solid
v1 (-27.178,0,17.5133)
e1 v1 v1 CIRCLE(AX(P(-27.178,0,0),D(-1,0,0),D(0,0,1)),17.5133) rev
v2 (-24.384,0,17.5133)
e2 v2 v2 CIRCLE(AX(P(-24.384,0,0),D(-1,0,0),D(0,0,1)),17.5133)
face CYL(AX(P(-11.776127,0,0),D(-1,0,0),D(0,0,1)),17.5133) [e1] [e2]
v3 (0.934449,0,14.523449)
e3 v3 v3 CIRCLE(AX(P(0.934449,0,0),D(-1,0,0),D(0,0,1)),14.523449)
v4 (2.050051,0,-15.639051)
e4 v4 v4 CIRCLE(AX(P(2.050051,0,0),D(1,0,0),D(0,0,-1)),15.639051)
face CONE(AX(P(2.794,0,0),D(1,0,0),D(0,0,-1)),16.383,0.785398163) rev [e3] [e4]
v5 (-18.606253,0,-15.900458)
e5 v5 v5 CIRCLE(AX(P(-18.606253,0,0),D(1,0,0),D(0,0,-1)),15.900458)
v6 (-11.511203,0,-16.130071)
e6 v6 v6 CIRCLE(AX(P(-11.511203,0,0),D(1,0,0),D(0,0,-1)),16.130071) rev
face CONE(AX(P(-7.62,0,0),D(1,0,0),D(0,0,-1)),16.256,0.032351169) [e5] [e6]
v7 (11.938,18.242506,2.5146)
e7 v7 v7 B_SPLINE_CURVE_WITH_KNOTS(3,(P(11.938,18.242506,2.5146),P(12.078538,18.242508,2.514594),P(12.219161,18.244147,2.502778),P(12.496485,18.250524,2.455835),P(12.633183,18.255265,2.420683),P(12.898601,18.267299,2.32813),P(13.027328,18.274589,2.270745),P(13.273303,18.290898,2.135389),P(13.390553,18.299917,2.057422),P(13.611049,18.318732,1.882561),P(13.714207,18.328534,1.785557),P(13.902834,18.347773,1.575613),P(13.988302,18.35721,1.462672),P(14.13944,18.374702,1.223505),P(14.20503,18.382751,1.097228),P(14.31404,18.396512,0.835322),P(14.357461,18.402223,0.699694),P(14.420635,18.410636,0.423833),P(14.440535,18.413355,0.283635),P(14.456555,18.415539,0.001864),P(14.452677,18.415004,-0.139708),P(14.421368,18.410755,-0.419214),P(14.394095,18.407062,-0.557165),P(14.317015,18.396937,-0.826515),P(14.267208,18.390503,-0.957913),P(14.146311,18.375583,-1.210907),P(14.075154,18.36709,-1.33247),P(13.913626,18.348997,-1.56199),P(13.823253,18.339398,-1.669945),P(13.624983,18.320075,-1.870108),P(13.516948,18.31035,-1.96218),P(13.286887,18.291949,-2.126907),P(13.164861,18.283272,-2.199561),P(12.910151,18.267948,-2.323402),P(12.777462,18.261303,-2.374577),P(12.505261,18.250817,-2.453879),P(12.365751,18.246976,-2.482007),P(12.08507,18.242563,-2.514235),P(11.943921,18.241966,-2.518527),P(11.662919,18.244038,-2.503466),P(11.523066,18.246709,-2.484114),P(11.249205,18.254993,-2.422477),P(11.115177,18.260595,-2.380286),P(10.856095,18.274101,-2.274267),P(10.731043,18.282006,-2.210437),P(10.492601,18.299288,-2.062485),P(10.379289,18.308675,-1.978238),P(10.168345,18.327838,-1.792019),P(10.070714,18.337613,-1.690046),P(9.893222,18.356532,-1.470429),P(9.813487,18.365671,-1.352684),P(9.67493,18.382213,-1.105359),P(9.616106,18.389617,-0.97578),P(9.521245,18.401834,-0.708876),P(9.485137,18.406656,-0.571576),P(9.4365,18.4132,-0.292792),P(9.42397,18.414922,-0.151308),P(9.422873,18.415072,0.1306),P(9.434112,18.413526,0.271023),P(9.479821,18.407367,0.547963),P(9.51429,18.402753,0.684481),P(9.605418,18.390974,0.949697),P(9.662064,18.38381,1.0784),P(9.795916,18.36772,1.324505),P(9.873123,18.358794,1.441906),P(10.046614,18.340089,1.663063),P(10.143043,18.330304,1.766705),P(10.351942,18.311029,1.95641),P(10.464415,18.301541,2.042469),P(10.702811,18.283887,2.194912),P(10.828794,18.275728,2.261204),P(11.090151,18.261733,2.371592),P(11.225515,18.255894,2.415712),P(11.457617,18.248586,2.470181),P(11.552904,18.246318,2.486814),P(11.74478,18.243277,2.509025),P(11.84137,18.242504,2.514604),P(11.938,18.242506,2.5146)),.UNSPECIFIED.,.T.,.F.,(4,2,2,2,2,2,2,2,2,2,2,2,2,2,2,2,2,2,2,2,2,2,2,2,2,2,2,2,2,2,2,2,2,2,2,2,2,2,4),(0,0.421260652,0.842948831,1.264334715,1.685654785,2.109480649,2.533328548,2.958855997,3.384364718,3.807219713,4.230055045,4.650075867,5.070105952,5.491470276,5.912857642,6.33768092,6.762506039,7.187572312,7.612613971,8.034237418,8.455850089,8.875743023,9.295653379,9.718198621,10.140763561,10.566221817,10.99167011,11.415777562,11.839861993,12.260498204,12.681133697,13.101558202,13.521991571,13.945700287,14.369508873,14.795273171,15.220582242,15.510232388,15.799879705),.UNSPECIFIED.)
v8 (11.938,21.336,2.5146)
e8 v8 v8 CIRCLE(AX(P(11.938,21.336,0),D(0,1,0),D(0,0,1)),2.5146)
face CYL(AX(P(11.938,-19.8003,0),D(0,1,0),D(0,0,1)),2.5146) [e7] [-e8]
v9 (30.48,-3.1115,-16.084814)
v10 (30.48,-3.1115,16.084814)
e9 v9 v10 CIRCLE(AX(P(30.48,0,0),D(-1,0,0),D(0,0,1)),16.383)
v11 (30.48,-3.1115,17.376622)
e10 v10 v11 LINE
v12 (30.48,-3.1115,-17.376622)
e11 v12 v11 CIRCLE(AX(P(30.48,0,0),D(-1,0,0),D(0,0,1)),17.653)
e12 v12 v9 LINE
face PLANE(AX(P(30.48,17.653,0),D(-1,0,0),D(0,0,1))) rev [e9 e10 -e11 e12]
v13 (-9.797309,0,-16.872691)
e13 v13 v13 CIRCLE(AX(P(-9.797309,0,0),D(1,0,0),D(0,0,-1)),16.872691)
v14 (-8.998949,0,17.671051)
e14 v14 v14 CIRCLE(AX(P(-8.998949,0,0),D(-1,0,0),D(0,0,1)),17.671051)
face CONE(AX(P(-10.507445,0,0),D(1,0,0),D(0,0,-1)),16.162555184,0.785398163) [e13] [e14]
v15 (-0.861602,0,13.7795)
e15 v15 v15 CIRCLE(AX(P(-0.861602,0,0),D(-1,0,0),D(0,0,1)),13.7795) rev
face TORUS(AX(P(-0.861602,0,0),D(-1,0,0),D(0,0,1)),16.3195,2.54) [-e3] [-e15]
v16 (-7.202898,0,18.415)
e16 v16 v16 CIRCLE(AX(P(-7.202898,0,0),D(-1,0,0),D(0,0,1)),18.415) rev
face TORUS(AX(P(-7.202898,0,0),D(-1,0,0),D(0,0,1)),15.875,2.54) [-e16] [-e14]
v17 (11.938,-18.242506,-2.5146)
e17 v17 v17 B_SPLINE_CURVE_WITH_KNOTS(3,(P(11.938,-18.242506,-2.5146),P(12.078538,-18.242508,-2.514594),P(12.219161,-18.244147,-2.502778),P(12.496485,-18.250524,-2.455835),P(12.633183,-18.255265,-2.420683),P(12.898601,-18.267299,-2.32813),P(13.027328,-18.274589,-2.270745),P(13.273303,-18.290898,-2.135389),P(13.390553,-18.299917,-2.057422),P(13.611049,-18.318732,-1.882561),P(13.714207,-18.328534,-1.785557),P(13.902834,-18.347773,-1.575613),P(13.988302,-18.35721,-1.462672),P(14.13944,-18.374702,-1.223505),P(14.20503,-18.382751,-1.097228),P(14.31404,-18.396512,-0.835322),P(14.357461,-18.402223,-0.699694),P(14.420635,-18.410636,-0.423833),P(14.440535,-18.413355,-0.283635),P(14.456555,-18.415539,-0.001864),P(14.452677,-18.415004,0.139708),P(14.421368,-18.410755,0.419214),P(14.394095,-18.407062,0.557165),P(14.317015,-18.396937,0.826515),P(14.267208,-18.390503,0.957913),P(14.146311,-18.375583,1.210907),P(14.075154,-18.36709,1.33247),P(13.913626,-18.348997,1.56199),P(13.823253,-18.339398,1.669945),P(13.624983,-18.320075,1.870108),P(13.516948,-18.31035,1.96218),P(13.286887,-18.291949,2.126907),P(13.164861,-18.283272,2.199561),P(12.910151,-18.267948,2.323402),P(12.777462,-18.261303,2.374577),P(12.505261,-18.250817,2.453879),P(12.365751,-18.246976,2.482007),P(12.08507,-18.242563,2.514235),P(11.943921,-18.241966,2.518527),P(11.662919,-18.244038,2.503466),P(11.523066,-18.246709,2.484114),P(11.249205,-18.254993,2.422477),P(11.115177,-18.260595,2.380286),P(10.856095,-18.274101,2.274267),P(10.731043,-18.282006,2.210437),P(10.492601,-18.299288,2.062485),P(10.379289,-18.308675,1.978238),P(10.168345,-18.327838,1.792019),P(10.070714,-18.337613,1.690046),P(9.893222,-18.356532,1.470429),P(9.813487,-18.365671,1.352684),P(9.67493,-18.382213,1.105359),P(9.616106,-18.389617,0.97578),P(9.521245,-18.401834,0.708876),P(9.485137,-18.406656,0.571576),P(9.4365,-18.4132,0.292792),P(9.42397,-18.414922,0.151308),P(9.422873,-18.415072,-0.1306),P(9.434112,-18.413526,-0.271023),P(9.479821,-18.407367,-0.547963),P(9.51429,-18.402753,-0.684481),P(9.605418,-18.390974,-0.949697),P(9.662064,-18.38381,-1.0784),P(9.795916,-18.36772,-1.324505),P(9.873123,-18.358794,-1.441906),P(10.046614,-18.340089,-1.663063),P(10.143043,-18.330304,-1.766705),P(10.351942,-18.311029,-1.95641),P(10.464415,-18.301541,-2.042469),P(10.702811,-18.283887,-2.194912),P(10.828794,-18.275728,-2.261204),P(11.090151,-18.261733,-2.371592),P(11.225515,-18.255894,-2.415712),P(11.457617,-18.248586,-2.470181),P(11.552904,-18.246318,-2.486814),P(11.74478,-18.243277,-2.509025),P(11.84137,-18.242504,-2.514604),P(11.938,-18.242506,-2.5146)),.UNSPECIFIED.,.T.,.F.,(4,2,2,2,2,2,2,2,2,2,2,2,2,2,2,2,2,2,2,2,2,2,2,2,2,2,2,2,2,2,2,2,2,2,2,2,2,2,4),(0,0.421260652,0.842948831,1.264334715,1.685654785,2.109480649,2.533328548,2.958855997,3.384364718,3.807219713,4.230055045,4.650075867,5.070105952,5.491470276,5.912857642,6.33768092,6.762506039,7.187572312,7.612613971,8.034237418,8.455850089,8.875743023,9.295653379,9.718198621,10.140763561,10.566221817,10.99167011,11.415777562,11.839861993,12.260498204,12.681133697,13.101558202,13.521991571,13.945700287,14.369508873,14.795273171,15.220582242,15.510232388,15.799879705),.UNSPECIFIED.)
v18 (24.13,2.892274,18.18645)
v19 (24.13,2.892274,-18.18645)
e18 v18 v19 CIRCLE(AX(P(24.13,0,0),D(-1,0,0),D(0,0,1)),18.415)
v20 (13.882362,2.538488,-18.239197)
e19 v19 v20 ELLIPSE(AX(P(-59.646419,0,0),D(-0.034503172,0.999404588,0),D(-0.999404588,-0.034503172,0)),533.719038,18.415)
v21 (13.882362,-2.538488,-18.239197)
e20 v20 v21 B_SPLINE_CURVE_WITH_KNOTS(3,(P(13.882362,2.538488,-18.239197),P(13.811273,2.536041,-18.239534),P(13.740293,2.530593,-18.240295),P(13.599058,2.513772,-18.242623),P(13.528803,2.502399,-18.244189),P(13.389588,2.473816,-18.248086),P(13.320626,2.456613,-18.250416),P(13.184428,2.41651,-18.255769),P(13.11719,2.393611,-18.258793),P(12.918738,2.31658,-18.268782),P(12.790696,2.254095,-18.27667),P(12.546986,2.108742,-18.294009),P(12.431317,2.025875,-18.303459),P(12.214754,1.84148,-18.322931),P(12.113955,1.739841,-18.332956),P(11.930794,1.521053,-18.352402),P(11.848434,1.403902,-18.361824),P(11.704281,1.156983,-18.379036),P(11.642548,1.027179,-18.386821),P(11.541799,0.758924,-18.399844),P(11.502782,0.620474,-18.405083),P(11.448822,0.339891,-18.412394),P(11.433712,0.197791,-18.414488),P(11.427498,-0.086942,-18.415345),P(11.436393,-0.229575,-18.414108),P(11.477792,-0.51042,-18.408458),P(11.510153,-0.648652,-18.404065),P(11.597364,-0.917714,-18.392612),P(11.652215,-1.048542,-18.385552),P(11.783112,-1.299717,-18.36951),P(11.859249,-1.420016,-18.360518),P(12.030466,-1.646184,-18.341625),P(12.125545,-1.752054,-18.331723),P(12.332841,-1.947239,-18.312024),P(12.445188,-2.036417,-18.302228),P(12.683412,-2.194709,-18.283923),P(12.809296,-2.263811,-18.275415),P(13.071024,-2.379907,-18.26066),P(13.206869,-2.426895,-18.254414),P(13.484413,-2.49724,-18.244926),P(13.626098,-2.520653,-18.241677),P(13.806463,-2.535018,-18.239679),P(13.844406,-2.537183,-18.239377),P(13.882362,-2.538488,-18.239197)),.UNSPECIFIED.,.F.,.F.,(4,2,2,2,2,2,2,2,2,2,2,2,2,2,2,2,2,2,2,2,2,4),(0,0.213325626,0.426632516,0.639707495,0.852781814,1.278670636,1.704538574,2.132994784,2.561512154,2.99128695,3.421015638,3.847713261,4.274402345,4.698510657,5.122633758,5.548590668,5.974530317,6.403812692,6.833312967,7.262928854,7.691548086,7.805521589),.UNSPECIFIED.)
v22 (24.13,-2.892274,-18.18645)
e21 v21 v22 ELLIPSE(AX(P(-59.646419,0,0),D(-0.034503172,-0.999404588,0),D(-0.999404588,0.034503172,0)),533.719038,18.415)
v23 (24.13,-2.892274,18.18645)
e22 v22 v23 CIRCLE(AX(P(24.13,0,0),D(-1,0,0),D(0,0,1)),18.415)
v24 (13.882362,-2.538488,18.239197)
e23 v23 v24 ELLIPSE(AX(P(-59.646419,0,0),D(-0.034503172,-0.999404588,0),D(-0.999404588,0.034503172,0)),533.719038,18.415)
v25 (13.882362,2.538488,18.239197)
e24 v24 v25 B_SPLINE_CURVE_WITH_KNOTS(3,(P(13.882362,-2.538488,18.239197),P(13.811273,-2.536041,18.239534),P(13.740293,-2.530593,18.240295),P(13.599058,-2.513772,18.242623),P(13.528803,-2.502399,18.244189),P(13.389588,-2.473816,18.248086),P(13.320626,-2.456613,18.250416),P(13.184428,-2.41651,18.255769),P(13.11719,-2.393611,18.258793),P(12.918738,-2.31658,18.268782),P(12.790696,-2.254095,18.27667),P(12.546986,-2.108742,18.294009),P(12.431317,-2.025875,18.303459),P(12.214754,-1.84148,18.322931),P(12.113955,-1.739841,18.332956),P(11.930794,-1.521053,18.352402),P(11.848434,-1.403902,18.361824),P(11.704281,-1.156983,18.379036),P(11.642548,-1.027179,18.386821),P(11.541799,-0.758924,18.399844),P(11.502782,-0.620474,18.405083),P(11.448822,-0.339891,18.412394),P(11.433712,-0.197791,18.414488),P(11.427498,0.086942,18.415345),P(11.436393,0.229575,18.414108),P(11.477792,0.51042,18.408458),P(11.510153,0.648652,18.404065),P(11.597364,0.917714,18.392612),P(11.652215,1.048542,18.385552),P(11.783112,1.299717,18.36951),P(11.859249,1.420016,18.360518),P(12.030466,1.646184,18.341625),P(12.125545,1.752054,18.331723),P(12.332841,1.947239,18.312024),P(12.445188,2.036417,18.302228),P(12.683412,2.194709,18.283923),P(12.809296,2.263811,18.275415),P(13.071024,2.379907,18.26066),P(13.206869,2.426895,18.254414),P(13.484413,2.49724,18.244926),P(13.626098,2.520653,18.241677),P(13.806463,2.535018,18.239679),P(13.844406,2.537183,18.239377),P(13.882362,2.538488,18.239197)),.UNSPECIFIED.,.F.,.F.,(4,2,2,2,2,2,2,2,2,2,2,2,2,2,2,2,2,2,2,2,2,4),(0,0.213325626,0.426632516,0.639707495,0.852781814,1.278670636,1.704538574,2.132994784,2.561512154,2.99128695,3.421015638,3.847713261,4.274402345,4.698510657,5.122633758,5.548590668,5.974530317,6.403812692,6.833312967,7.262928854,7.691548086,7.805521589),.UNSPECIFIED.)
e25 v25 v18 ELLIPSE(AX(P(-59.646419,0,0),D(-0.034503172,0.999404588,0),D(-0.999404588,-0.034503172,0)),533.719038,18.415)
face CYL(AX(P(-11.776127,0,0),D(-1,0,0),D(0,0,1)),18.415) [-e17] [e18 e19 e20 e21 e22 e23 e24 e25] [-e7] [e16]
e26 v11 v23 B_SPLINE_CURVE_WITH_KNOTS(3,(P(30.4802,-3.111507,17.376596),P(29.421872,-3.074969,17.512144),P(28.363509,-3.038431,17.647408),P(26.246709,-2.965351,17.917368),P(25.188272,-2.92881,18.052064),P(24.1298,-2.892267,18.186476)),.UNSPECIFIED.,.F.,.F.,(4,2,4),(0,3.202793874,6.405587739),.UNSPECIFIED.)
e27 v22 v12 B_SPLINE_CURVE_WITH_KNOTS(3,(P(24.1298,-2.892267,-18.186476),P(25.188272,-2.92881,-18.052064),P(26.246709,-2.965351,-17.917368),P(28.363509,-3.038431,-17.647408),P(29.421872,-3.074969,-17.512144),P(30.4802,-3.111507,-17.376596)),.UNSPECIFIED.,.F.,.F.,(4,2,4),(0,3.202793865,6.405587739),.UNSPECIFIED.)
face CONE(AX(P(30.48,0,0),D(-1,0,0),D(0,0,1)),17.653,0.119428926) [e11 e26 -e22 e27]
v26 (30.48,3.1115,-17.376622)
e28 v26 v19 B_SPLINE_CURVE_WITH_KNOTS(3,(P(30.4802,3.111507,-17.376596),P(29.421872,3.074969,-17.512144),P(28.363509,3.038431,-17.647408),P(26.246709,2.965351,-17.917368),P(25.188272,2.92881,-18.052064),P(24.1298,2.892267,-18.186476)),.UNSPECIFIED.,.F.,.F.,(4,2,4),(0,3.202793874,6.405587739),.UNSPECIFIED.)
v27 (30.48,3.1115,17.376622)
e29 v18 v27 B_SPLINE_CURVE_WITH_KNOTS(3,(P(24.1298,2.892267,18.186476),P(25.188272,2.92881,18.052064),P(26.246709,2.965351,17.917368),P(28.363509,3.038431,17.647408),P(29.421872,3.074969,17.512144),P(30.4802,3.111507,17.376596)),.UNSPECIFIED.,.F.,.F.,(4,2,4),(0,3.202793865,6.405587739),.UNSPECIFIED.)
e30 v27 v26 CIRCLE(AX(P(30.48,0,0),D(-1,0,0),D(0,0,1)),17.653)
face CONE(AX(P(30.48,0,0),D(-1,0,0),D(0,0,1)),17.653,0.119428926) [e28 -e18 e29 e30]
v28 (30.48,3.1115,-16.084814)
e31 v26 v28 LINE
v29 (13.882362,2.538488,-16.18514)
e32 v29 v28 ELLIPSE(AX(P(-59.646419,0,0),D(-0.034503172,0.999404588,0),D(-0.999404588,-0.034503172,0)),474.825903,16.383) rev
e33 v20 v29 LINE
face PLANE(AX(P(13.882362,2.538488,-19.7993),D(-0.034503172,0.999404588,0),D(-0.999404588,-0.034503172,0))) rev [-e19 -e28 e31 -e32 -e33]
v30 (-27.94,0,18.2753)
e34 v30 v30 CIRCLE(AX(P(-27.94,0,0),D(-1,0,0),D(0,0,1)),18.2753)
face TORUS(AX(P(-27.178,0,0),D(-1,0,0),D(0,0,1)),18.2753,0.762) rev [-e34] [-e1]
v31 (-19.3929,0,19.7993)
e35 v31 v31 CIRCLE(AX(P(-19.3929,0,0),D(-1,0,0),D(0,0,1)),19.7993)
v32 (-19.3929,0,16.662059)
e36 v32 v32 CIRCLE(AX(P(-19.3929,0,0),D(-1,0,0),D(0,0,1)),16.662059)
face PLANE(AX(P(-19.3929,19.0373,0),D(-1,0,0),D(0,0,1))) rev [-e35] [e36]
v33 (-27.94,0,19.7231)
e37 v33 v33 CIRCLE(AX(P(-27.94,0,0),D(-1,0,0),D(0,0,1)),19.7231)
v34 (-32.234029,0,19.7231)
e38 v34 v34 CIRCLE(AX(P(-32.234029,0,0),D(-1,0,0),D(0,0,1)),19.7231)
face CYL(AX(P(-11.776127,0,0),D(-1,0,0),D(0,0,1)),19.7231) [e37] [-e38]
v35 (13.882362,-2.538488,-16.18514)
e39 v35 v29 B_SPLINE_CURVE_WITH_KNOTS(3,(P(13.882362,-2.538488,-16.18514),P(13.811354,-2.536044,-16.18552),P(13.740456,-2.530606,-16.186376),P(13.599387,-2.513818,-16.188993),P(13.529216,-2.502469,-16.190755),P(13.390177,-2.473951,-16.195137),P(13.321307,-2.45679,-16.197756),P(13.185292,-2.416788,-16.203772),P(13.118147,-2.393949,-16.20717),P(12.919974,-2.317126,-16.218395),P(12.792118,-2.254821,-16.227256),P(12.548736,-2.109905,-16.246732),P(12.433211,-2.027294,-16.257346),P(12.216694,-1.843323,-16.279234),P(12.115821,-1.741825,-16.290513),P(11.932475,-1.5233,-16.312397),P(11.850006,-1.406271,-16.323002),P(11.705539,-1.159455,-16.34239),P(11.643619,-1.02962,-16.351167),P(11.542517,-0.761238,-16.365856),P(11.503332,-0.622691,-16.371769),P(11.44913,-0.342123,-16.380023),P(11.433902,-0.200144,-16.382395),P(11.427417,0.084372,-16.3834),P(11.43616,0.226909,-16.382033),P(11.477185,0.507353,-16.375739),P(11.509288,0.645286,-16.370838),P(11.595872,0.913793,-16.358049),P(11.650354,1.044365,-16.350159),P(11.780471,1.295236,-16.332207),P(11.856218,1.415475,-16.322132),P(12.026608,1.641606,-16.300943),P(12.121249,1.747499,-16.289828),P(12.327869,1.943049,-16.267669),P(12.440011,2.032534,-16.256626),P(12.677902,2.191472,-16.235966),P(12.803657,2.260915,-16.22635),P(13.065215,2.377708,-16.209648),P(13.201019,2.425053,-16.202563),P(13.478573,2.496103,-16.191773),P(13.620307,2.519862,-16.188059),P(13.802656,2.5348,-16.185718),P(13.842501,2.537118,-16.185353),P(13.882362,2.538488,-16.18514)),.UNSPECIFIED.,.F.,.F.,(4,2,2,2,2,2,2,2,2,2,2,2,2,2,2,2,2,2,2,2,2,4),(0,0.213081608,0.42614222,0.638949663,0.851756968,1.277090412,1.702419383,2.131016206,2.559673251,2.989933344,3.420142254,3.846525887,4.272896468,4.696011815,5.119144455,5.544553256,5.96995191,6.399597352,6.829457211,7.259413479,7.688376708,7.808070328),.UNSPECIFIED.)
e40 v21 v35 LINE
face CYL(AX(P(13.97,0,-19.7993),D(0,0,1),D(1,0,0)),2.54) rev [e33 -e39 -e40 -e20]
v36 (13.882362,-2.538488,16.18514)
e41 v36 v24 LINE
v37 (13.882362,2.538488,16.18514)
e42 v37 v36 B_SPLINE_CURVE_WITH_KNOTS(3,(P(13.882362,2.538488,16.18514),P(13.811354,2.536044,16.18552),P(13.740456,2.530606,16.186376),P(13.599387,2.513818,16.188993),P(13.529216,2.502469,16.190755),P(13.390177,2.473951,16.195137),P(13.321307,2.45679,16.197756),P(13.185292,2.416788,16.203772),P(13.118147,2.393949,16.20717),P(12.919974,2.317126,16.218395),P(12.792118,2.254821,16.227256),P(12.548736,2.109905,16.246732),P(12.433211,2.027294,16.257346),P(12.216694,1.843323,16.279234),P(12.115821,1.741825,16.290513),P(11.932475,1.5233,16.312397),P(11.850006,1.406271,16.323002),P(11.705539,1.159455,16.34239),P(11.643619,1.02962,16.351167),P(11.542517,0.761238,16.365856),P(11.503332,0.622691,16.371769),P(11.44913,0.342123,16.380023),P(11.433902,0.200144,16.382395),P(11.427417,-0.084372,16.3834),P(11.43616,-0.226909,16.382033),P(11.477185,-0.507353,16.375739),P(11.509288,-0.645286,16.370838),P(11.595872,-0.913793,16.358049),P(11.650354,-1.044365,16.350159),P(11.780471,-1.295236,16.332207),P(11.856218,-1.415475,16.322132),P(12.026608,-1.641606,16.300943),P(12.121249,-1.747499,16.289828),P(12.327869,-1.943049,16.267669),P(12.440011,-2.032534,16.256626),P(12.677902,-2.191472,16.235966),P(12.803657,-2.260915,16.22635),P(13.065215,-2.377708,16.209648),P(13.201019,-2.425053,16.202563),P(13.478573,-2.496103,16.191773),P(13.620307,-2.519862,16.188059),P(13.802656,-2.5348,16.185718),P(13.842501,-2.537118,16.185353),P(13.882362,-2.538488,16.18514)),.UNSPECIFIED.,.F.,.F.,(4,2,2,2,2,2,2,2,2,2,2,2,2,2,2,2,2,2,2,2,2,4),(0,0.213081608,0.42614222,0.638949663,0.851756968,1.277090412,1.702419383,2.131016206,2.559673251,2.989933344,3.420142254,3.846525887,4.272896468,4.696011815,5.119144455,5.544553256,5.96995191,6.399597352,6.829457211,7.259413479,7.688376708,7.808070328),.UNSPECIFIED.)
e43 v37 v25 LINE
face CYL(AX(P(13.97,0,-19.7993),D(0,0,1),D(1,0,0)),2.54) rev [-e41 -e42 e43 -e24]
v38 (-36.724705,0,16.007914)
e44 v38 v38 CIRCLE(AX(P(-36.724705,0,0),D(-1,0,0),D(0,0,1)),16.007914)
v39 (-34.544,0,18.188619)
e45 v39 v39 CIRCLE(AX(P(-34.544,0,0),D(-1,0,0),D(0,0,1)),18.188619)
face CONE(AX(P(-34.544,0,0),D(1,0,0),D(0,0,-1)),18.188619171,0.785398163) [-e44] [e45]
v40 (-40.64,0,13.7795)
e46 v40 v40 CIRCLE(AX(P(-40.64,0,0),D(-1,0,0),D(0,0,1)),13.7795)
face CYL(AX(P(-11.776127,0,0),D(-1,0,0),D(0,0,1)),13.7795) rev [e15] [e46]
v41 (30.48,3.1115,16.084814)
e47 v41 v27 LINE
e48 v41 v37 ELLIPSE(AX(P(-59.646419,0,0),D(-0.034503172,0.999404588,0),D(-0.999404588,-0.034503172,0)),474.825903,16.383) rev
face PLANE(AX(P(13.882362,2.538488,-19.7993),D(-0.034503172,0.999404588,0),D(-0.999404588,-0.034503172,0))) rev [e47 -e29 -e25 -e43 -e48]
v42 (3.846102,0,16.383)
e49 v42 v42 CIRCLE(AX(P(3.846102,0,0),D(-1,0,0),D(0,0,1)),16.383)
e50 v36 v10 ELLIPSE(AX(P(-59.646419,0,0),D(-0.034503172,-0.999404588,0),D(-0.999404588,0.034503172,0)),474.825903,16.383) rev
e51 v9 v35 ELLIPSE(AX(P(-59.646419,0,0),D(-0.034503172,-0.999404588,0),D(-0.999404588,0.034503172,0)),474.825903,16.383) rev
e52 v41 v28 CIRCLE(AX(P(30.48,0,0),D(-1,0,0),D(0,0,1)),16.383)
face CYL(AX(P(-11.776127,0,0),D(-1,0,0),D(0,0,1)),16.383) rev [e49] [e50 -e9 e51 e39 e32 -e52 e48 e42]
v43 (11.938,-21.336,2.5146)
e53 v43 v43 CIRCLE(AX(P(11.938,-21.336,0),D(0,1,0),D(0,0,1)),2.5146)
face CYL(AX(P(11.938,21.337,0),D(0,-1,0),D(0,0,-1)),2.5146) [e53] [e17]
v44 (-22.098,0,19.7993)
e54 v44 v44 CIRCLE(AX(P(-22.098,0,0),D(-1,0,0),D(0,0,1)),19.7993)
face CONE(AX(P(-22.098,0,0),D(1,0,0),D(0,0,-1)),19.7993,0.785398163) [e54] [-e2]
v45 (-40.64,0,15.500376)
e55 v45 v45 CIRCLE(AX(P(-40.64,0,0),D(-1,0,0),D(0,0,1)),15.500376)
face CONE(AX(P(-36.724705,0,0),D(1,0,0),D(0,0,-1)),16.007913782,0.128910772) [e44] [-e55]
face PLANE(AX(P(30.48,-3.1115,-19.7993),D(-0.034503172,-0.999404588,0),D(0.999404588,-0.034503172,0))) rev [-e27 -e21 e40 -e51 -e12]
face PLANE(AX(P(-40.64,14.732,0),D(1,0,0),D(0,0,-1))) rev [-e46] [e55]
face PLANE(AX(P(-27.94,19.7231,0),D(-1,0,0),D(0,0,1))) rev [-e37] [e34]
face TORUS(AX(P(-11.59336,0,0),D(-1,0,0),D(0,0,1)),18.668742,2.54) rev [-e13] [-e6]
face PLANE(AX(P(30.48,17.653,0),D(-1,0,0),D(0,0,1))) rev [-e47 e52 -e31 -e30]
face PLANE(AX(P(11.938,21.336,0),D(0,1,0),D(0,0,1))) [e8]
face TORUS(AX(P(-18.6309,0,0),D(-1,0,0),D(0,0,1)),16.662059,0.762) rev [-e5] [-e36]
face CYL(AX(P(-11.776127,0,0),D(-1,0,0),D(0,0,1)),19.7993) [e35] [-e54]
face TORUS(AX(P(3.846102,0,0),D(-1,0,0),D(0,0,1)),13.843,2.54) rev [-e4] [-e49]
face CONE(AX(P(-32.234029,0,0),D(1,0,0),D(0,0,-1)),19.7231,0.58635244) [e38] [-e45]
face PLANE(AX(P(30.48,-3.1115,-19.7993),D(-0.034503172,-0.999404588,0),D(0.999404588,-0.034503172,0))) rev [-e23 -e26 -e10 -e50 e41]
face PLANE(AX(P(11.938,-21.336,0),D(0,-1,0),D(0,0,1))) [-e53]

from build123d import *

# Parameters (mm, degrees)
CUT_EXTRUDE3_DEPTH       = 50.352144442
CUT_EXTRUDE3_DEPTH_BACK  = 50.352144442
BOSS_EXTRUDE1_REACH      = 63.121
BOSS_EXTRUDE1_END_RADIUS = 18.415
SKETCH3_R                = 2.5146
FILLET1_R                = 0.762
CHAMFER1_SIZE            = 2.794
CHAMFER1_SIZE_2          = 2.888956472
FILLET3_R                = 2.54


with BuildPart() as part:
    # Sketch1 → Revolve1 (revolve)
    with BuildSketch(Plane.XY, mode=Mode.PRIVATE) as revolve1_sk:
        Polygon((-40.64, 13.7795), (0, 13.7795), (0, 16.383), (30.48, 16.383), (30.48, 17.653), (24.13, 18.415), (-7.62, 18.415), (-7.62, 16.256), (-19.3929, 15.875), (-19.3929, 19.0373), (-19.3929, 19.7993), (-22.098, 19.7993), (-24.384, 17.5133), (-27.94, 17.5133), (-27.94, 19.7231), (-32.234028859, 19.7231), (-34.544, 18.188619171), (-36.724705389, 16.007913782), (-40.64, 15.500375591), (-40.64, 14.732), align=None)
    revolve(revolve1_sk.sketch.rotate(Axis((-11.776127049, 0, 0), (1, 0, 0)), 90), axis=Axis((-11.776127049, 0, 0), (1, 0, 0)))

    # Sketch2 → Cut-Extrude3 (cut, two sides: drawn at the far end of the back side and taken through both)
    with BuildSketch(Plane.XY.offset(-CUT_EXTRUDE3_DEPTH_BACK)):
        with BuildLine():
            Line((13.882361942, 2.538487654), (30.48, 3.1115))
            Line((30.48, 3.1115), (30.48, -3.1115))
            Line((30.48, -3.1115), (13.882361942, -2.538487654))
            ThreePointArc((13.882361942, -2.538487654), (11.43, 0), (13.882361942, 2.538487654))
        make_face()
    extrude(amount=CUT_EXTRUDE3_DEPTH + CUT_EXTRUDE3_DEPTH_BACK, mode=Mode.SUBTRACT)

    # Boss-Extrude1: up to this cylinder (the profile starts outside it)
    boss_extrude1_end = Plane(origin=(11.938, 0, 0), z_dir=(-1, 0, 0)) * Cylinder(BOSS_EXTRUDE1_END_RADIUS, 164.072, mode=Mode.PRIVATE)
    # Sketch3 → Boss-Extrude1 (add, up to the surface)
    with BuildSketch(Plane(origin=(0, 21.336, 0), x_dir=(1, 0, 0), z_dir=(0, 1, 0)), mode=Mode.PRIVATE) as boss_extrude1_sk1:
        with Locations(Location((11.938, 0, 0), (0, 0, 270))):
            Circle(SKETCH3_R)
    boss_extrude1_tool1 = extrude(boss_extrude1_sk1.sketch, amount=-BOSS_EXTRUDE1_REACH, mode=Mode.PRIVATE) - boss_extrude1_end
    boss_extrude1 = boss_extrude1_tool1.solids().sort_by_distance((11.938, 21.336, 0))[0]
    add(boss_extrude1)

    # Mirror1: Boss-Extrude1 across plane
    add(boss_extrude1.mirror(Plane.ZX))

    # Fillet1
    fillet1_edges = [part.edges().sort_by_distance(p)[0] for p in [
        (-27.94, 0, -17.5133),
        (-19.3929, 0, -15.875),
    ]]
    fillet(fillet1_edges, radius=FILLET1_R)

    # Chamfer1
    # the kernel refuses this chamfer: 2.888956472, 2.794 mm, written as the material it adds along each edge
    with BuildSketch(Plane(origin=(0, 0, 0), x_dir=(0, 0, 1), z_dir=(0, 1, 0))) as chamfer1_piece_1_section:
        Polygon((16.383 - CHAMFER1_SIZE, 0), (16.383, CHAMFER1_SIZE), (16.383, 0), align=None)
    chamfer1_piece_1 = revolve(axis=Axis((0, 0, 0), (1, 0, 0)), mode=Mode.PRIVATE)
    chamfer1_piece_1 = chamfer1_piece_1 - Plane(origin=(1.479100002, 0, 0), x_dir=(0, 0, 1), z_dir=(1, 0, 0)) * Cylinder(13.7795, 66, mode=Mode.PRIVATE)
    add(chamfer1_piece_1)
    with BuildSketch(Plane(origin=(-7.62, 0, 0), x_dir=(0, 0, 1), z_dir=(0, 1, 0))) as chamfer1_piece_2_section:
        Polygon((16.256 - CHAMFER1_SIZE_2 * 0.0323455257839, -CHAMFER1_SIZE_2 * 0.999476746721), (16.256 + CHAMFER1_SIZE, 0), (16.256, 0), align=None)
    chamfer1_piece_2 = revolve(axis=Axis((-7.62, 0, 0), (1, 0, 0)), mode=Mode.PRIVATE)
    chamfer1_piece_2 = chamfer1_piece_2 & Plane(origin=(-9.368047324, 0, 0), x_dir=(0, 0, 1), z_dir=(-1, 0, 0)) * Cylinder(18.415, 77, mode=Mode.PRIVATE)
    add(chamfer1_piece_2)

    # Fillet3
    fillet3_edges = [part.edges().sort_by_distance(p)[0] for p in [
        (-10.507444816, 0, -16.162555184),
        (2.794, 0, -16.383),
        (-8.255, 0, -18.415),
        (0.1905, 0, -13.7795),
    ]]
    fillet(fillet3_edges, radius=FILLET3_R)


solid = part.part
